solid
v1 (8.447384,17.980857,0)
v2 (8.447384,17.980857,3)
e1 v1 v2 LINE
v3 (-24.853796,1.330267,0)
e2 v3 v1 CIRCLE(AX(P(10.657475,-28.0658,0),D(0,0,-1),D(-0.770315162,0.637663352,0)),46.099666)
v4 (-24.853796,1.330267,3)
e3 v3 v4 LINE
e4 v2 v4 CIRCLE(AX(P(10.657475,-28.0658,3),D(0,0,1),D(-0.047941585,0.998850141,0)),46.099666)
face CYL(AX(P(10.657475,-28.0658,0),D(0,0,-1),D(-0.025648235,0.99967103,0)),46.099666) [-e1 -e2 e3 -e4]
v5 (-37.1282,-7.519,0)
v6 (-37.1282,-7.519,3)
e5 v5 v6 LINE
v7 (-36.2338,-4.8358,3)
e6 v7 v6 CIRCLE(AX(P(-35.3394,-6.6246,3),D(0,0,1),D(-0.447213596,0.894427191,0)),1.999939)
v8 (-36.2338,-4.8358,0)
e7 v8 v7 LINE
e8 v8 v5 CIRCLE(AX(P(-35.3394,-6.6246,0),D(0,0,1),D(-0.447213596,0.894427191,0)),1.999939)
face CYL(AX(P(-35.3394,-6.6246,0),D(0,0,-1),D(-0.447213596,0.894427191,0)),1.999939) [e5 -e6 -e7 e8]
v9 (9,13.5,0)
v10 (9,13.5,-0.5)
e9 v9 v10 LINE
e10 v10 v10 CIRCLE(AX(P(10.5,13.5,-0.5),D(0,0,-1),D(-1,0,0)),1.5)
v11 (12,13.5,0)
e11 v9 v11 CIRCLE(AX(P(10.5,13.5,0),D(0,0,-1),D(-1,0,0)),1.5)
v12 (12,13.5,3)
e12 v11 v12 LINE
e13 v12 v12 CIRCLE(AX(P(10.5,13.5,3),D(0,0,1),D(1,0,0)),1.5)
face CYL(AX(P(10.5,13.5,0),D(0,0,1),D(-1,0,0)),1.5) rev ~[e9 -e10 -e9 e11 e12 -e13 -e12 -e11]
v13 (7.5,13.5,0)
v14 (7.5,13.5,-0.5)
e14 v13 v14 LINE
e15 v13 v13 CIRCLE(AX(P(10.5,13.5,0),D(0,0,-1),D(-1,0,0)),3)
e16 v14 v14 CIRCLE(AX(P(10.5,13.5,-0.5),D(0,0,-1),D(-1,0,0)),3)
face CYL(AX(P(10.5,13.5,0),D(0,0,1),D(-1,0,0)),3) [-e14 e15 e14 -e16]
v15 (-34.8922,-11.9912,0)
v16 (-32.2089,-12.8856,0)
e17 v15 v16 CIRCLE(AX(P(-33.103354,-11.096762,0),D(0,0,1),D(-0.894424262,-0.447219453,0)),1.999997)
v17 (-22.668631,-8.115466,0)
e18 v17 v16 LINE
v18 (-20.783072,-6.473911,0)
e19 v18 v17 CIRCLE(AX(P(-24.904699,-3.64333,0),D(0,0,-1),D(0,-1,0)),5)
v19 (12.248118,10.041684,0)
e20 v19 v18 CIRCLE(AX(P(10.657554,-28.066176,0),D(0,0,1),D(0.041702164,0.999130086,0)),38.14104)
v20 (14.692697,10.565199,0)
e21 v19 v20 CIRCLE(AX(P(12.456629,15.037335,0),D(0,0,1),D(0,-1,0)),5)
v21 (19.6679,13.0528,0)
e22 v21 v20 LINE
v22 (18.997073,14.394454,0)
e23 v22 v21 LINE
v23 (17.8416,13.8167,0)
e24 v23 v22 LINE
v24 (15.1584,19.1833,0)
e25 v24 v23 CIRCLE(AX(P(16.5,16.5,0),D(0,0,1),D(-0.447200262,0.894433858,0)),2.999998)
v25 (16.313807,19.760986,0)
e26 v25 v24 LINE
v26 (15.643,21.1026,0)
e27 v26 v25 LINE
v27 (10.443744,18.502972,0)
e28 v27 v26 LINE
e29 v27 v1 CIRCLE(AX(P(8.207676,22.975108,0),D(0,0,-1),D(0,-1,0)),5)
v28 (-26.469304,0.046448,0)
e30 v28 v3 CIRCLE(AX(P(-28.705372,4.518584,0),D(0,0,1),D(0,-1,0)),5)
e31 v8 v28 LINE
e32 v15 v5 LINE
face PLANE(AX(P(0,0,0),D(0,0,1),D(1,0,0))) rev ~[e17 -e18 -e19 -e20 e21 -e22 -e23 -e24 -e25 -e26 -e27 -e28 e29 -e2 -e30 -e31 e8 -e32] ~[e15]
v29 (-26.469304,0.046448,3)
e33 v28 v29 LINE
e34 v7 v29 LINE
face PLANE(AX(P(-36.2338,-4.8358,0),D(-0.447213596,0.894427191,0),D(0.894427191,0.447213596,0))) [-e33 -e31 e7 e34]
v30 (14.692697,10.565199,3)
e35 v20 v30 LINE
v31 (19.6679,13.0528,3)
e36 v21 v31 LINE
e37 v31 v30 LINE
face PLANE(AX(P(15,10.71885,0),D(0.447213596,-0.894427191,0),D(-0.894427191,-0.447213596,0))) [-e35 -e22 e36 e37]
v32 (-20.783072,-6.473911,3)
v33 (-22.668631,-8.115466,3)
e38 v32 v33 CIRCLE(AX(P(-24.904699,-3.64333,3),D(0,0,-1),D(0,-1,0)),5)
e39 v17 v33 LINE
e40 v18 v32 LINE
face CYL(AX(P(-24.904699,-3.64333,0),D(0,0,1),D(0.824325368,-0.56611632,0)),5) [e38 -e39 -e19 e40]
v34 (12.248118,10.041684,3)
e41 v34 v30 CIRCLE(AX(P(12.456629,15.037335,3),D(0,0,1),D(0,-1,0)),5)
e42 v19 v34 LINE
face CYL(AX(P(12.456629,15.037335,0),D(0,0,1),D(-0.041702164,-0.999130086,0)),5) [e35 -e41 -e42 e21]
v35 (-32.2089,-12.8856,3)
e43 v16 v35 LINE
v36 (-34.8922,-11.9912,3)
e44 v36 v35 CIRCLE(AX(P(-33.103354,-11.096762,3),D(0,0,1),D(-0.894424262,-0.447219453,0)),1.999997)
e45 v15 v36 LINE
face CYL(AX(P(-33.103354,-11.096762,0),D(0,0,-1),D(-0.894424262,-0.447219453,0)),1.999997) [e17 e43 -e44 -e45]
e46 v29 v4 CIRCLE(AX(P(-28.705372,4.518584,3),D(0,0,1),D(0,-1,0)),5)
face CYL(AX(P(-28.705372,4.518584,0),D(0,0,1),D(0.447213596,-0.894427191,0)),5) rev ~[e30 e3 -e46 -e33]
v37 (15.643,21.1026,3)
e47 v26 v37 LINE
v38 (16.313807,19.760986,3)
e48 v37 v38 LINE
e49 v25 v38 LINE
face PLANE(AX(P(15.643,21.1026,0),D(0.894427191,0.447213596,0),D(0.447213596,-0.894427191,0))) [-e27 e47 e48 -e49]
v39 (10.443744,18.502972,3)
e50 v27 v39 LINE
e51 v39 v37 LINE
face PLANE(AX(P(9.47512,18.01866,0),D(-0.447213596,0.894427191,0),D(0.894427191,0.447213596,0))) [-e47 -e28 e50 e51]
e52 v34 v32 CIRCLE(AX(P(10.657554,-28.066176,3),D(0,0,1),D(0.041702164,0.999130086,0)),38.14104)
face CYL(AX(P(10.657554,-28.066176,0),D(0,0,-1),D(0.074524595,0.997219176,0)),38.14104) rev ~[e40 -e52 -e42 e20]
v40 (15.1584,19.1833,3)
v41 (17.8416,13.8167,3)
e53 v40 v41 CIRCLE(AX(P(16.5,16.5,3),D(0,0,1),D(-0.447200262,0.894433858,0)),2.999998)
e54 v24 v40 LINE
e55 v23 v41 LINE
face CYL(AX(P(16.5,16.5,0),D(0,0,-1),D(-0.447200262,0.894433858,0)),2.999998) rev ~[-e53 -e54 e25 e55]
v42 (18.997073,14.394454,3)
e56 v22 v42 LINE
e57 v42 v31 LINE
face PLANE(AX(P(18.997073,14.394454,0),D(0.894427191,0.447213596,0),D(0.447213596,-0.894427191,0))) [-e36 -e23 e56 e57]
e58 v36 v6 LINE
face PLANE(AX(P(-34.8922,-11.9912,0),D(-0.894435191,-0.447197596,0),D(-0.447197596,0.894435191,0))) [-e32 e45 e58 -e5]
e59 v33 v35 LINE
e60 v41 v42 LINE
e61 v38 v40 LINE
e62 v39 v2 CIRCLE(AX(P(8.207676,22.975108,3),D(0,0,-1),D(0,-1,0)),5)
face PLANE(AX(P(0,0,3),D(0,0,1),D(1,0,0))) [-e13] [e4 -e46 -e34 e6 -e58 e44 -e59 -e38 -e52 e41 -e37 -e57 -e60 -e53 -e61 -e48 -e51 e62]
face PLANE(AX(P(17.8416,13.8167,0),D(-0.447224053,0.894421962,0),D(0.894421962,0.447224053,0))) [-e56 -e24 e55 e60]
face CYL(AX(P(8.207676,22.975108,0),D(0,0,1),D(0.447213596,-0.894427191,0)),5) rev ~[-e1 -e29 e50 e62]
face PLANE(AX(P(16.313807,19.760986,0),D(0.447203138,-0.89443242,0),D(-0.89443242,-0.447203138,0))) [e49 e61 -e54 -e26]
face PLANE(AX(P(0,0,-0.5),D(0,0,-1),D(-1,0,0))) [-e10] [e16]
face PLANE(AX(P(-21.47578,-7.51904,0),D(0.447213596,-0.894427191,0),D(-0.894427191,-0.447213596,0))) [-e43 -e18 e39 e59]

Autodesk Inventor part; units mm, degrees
ref_plane "YZ Plane" through (0, 0, 0) normal (1, 0, 0) x (0, 1, 0)
ref_plane "XZ Plane" through (0, 0, 0) normal (0, 1, 0) x (-1, 0, 0)
ref_plane "XY Plane" through (0, 0, 0) normal (0, 0, 1) x (1, 0, 0)
ref_plane "Work Plane1" through (0, 0, 0) normal (0, 0, 1) x (1, 0, 0)
sketch "Sketch1" plane through (0, 0, 0) normal (0, 0, 1) x (1, 0, 0)
  arc A0 (-15, -23) -> (-13.6245, -24.9) centre (-13, -23) ccw projected
  line L0 (-13.6245, -24.9) -> (13.6245, -24.9) projected
  arc A1 (13.6245, -24.9) -> (15, -23) centre (13, -23) ccw projected
  line L1 (15, -23) -> (15, 23) projected
  arc A2 (15, 23) -> (13.6245, 24.9) centre (13, 23) ccw projected
  line L2 (13.6245, 24.9) -> (-13.6245, 24.9) projected
  arc A3 (-13.6245, 24.9) -> (-15, 23) centre (-13, 23) ccw projected
  line L3 (-15, 23) -> (-15, -23) projected
  circle A4 centre (10.5, 13.5) radius 1.4 construction
  circle A5 centre (16.5, 16.5) radius 2.45 projected
  line L4 (-36.2338, -4.8358) -> (15.643, 21.1026)
  line L5 (15.643, 21.1026) -> (19.6679, 13.0528)
  line L6 (19.6679, 13.0528) -> (-32.2089, -12.8856)
  line L7 (-34.8922, -11.9912) -> (-37.1282, -7.519)
  line L8 (-38.0227, -5.7302) -> (19.6679, 13.0528) construction
  line L9 (15.643, 21.1026) -> (-33.9978, -13.78) construction
  line L10 (16.5, 16.5) -> (10.5, 13.5)
  line L11 (16.5, 16.5) -> (19.9213, 18.2106) construction
  line L12 (17.8416, 13.8167) -> (21.2629, 15.5274)
  line L13 (18.5797, 20.8939) -> (15.1584, 19.1833)
  arc A6 (15.1584, 19.1833) -> (17.8416, 13.8167) centre (16.5, 16.5) ccw
  arc A7 (21.2629, 15.5274) -> (18.5797, 20.8939) centre (19.9213, 18.2106) ccw
  arc A8 (-34.8922, -11.9912) -> (-32.2089, -12.8856) centre (-33.1033, -11.0967) ccw
  arc A9 (-36.2338, -4.8358) -> (-37.1282, -7.519) centre (-35.3394, -6.6246) ccw
  circle A10 centre (10.5, 13.5) radius 1.5
  arc A11 (13.5, 9.9688) -> (-21.4758, -7.519) centre (10.6575, -28.0659) ccw
  arc A12 (9.4751, 18.0187) -> (-25.5007, 0.5308) centre (10.6575, -28.0659) ccw
  circle A13 centre (0, -18.9) radius 1.4 projected
  point P0 (0, 0)
  point P1 (-9.1774, 3.6613)
  point P2 (18.2106, 17.3553)
  point P3 (16.3138, 19.761)
  point P4 (18.9971, 14.3944)
  dimension "d0" = 60
  dimension "d1" = 9
  dimension "d2" = 4.5
  dimension "d3" = 8
  dimension "d4" = 6
  dimension "d5" = 2
  dimension "d8" = 3
  dimension "d9" = 14
  dimension "d10" = 14
extrude "Extrusion1" add sketch "Sketch1" along normal blind 3 contours A11 L6 A8 L7 A9 L4 L3 | L3 L4 L1 A6 L6 A11 | L4 A12 L3 | L3 A12 L4 | L1 A6 L12 L5 L6 | L4 L5 L13 A6 L1
fillet "Fillet1" radius 5 4 edges at (-25.5007, 0.5308, 1.5) (-21.4758, -7.519, 1.5) (9.4751, 18.0187, 1.5) (13.5, 9.9688, 1.5)
sketch "Sketch2" plane through (0, 0, 0) normal (0, 0, -1) x (-1, 0, 0)
  circle A0 centre (-10.5, 13.5) radius 1.1933 projected
  circle A1 centre (-10.5, 13.5) radius 1.5 projected
  circle A2 centre (-10.5, 13.5) radius 3
  point P0 (0, 0)
  dimension "d12" = 6
extrude "Extrusion2" add sketch "Sketch2" along normal blind 0.5 contours A2
properties part number "20_Cube_4_insert_xy_levelarm"
